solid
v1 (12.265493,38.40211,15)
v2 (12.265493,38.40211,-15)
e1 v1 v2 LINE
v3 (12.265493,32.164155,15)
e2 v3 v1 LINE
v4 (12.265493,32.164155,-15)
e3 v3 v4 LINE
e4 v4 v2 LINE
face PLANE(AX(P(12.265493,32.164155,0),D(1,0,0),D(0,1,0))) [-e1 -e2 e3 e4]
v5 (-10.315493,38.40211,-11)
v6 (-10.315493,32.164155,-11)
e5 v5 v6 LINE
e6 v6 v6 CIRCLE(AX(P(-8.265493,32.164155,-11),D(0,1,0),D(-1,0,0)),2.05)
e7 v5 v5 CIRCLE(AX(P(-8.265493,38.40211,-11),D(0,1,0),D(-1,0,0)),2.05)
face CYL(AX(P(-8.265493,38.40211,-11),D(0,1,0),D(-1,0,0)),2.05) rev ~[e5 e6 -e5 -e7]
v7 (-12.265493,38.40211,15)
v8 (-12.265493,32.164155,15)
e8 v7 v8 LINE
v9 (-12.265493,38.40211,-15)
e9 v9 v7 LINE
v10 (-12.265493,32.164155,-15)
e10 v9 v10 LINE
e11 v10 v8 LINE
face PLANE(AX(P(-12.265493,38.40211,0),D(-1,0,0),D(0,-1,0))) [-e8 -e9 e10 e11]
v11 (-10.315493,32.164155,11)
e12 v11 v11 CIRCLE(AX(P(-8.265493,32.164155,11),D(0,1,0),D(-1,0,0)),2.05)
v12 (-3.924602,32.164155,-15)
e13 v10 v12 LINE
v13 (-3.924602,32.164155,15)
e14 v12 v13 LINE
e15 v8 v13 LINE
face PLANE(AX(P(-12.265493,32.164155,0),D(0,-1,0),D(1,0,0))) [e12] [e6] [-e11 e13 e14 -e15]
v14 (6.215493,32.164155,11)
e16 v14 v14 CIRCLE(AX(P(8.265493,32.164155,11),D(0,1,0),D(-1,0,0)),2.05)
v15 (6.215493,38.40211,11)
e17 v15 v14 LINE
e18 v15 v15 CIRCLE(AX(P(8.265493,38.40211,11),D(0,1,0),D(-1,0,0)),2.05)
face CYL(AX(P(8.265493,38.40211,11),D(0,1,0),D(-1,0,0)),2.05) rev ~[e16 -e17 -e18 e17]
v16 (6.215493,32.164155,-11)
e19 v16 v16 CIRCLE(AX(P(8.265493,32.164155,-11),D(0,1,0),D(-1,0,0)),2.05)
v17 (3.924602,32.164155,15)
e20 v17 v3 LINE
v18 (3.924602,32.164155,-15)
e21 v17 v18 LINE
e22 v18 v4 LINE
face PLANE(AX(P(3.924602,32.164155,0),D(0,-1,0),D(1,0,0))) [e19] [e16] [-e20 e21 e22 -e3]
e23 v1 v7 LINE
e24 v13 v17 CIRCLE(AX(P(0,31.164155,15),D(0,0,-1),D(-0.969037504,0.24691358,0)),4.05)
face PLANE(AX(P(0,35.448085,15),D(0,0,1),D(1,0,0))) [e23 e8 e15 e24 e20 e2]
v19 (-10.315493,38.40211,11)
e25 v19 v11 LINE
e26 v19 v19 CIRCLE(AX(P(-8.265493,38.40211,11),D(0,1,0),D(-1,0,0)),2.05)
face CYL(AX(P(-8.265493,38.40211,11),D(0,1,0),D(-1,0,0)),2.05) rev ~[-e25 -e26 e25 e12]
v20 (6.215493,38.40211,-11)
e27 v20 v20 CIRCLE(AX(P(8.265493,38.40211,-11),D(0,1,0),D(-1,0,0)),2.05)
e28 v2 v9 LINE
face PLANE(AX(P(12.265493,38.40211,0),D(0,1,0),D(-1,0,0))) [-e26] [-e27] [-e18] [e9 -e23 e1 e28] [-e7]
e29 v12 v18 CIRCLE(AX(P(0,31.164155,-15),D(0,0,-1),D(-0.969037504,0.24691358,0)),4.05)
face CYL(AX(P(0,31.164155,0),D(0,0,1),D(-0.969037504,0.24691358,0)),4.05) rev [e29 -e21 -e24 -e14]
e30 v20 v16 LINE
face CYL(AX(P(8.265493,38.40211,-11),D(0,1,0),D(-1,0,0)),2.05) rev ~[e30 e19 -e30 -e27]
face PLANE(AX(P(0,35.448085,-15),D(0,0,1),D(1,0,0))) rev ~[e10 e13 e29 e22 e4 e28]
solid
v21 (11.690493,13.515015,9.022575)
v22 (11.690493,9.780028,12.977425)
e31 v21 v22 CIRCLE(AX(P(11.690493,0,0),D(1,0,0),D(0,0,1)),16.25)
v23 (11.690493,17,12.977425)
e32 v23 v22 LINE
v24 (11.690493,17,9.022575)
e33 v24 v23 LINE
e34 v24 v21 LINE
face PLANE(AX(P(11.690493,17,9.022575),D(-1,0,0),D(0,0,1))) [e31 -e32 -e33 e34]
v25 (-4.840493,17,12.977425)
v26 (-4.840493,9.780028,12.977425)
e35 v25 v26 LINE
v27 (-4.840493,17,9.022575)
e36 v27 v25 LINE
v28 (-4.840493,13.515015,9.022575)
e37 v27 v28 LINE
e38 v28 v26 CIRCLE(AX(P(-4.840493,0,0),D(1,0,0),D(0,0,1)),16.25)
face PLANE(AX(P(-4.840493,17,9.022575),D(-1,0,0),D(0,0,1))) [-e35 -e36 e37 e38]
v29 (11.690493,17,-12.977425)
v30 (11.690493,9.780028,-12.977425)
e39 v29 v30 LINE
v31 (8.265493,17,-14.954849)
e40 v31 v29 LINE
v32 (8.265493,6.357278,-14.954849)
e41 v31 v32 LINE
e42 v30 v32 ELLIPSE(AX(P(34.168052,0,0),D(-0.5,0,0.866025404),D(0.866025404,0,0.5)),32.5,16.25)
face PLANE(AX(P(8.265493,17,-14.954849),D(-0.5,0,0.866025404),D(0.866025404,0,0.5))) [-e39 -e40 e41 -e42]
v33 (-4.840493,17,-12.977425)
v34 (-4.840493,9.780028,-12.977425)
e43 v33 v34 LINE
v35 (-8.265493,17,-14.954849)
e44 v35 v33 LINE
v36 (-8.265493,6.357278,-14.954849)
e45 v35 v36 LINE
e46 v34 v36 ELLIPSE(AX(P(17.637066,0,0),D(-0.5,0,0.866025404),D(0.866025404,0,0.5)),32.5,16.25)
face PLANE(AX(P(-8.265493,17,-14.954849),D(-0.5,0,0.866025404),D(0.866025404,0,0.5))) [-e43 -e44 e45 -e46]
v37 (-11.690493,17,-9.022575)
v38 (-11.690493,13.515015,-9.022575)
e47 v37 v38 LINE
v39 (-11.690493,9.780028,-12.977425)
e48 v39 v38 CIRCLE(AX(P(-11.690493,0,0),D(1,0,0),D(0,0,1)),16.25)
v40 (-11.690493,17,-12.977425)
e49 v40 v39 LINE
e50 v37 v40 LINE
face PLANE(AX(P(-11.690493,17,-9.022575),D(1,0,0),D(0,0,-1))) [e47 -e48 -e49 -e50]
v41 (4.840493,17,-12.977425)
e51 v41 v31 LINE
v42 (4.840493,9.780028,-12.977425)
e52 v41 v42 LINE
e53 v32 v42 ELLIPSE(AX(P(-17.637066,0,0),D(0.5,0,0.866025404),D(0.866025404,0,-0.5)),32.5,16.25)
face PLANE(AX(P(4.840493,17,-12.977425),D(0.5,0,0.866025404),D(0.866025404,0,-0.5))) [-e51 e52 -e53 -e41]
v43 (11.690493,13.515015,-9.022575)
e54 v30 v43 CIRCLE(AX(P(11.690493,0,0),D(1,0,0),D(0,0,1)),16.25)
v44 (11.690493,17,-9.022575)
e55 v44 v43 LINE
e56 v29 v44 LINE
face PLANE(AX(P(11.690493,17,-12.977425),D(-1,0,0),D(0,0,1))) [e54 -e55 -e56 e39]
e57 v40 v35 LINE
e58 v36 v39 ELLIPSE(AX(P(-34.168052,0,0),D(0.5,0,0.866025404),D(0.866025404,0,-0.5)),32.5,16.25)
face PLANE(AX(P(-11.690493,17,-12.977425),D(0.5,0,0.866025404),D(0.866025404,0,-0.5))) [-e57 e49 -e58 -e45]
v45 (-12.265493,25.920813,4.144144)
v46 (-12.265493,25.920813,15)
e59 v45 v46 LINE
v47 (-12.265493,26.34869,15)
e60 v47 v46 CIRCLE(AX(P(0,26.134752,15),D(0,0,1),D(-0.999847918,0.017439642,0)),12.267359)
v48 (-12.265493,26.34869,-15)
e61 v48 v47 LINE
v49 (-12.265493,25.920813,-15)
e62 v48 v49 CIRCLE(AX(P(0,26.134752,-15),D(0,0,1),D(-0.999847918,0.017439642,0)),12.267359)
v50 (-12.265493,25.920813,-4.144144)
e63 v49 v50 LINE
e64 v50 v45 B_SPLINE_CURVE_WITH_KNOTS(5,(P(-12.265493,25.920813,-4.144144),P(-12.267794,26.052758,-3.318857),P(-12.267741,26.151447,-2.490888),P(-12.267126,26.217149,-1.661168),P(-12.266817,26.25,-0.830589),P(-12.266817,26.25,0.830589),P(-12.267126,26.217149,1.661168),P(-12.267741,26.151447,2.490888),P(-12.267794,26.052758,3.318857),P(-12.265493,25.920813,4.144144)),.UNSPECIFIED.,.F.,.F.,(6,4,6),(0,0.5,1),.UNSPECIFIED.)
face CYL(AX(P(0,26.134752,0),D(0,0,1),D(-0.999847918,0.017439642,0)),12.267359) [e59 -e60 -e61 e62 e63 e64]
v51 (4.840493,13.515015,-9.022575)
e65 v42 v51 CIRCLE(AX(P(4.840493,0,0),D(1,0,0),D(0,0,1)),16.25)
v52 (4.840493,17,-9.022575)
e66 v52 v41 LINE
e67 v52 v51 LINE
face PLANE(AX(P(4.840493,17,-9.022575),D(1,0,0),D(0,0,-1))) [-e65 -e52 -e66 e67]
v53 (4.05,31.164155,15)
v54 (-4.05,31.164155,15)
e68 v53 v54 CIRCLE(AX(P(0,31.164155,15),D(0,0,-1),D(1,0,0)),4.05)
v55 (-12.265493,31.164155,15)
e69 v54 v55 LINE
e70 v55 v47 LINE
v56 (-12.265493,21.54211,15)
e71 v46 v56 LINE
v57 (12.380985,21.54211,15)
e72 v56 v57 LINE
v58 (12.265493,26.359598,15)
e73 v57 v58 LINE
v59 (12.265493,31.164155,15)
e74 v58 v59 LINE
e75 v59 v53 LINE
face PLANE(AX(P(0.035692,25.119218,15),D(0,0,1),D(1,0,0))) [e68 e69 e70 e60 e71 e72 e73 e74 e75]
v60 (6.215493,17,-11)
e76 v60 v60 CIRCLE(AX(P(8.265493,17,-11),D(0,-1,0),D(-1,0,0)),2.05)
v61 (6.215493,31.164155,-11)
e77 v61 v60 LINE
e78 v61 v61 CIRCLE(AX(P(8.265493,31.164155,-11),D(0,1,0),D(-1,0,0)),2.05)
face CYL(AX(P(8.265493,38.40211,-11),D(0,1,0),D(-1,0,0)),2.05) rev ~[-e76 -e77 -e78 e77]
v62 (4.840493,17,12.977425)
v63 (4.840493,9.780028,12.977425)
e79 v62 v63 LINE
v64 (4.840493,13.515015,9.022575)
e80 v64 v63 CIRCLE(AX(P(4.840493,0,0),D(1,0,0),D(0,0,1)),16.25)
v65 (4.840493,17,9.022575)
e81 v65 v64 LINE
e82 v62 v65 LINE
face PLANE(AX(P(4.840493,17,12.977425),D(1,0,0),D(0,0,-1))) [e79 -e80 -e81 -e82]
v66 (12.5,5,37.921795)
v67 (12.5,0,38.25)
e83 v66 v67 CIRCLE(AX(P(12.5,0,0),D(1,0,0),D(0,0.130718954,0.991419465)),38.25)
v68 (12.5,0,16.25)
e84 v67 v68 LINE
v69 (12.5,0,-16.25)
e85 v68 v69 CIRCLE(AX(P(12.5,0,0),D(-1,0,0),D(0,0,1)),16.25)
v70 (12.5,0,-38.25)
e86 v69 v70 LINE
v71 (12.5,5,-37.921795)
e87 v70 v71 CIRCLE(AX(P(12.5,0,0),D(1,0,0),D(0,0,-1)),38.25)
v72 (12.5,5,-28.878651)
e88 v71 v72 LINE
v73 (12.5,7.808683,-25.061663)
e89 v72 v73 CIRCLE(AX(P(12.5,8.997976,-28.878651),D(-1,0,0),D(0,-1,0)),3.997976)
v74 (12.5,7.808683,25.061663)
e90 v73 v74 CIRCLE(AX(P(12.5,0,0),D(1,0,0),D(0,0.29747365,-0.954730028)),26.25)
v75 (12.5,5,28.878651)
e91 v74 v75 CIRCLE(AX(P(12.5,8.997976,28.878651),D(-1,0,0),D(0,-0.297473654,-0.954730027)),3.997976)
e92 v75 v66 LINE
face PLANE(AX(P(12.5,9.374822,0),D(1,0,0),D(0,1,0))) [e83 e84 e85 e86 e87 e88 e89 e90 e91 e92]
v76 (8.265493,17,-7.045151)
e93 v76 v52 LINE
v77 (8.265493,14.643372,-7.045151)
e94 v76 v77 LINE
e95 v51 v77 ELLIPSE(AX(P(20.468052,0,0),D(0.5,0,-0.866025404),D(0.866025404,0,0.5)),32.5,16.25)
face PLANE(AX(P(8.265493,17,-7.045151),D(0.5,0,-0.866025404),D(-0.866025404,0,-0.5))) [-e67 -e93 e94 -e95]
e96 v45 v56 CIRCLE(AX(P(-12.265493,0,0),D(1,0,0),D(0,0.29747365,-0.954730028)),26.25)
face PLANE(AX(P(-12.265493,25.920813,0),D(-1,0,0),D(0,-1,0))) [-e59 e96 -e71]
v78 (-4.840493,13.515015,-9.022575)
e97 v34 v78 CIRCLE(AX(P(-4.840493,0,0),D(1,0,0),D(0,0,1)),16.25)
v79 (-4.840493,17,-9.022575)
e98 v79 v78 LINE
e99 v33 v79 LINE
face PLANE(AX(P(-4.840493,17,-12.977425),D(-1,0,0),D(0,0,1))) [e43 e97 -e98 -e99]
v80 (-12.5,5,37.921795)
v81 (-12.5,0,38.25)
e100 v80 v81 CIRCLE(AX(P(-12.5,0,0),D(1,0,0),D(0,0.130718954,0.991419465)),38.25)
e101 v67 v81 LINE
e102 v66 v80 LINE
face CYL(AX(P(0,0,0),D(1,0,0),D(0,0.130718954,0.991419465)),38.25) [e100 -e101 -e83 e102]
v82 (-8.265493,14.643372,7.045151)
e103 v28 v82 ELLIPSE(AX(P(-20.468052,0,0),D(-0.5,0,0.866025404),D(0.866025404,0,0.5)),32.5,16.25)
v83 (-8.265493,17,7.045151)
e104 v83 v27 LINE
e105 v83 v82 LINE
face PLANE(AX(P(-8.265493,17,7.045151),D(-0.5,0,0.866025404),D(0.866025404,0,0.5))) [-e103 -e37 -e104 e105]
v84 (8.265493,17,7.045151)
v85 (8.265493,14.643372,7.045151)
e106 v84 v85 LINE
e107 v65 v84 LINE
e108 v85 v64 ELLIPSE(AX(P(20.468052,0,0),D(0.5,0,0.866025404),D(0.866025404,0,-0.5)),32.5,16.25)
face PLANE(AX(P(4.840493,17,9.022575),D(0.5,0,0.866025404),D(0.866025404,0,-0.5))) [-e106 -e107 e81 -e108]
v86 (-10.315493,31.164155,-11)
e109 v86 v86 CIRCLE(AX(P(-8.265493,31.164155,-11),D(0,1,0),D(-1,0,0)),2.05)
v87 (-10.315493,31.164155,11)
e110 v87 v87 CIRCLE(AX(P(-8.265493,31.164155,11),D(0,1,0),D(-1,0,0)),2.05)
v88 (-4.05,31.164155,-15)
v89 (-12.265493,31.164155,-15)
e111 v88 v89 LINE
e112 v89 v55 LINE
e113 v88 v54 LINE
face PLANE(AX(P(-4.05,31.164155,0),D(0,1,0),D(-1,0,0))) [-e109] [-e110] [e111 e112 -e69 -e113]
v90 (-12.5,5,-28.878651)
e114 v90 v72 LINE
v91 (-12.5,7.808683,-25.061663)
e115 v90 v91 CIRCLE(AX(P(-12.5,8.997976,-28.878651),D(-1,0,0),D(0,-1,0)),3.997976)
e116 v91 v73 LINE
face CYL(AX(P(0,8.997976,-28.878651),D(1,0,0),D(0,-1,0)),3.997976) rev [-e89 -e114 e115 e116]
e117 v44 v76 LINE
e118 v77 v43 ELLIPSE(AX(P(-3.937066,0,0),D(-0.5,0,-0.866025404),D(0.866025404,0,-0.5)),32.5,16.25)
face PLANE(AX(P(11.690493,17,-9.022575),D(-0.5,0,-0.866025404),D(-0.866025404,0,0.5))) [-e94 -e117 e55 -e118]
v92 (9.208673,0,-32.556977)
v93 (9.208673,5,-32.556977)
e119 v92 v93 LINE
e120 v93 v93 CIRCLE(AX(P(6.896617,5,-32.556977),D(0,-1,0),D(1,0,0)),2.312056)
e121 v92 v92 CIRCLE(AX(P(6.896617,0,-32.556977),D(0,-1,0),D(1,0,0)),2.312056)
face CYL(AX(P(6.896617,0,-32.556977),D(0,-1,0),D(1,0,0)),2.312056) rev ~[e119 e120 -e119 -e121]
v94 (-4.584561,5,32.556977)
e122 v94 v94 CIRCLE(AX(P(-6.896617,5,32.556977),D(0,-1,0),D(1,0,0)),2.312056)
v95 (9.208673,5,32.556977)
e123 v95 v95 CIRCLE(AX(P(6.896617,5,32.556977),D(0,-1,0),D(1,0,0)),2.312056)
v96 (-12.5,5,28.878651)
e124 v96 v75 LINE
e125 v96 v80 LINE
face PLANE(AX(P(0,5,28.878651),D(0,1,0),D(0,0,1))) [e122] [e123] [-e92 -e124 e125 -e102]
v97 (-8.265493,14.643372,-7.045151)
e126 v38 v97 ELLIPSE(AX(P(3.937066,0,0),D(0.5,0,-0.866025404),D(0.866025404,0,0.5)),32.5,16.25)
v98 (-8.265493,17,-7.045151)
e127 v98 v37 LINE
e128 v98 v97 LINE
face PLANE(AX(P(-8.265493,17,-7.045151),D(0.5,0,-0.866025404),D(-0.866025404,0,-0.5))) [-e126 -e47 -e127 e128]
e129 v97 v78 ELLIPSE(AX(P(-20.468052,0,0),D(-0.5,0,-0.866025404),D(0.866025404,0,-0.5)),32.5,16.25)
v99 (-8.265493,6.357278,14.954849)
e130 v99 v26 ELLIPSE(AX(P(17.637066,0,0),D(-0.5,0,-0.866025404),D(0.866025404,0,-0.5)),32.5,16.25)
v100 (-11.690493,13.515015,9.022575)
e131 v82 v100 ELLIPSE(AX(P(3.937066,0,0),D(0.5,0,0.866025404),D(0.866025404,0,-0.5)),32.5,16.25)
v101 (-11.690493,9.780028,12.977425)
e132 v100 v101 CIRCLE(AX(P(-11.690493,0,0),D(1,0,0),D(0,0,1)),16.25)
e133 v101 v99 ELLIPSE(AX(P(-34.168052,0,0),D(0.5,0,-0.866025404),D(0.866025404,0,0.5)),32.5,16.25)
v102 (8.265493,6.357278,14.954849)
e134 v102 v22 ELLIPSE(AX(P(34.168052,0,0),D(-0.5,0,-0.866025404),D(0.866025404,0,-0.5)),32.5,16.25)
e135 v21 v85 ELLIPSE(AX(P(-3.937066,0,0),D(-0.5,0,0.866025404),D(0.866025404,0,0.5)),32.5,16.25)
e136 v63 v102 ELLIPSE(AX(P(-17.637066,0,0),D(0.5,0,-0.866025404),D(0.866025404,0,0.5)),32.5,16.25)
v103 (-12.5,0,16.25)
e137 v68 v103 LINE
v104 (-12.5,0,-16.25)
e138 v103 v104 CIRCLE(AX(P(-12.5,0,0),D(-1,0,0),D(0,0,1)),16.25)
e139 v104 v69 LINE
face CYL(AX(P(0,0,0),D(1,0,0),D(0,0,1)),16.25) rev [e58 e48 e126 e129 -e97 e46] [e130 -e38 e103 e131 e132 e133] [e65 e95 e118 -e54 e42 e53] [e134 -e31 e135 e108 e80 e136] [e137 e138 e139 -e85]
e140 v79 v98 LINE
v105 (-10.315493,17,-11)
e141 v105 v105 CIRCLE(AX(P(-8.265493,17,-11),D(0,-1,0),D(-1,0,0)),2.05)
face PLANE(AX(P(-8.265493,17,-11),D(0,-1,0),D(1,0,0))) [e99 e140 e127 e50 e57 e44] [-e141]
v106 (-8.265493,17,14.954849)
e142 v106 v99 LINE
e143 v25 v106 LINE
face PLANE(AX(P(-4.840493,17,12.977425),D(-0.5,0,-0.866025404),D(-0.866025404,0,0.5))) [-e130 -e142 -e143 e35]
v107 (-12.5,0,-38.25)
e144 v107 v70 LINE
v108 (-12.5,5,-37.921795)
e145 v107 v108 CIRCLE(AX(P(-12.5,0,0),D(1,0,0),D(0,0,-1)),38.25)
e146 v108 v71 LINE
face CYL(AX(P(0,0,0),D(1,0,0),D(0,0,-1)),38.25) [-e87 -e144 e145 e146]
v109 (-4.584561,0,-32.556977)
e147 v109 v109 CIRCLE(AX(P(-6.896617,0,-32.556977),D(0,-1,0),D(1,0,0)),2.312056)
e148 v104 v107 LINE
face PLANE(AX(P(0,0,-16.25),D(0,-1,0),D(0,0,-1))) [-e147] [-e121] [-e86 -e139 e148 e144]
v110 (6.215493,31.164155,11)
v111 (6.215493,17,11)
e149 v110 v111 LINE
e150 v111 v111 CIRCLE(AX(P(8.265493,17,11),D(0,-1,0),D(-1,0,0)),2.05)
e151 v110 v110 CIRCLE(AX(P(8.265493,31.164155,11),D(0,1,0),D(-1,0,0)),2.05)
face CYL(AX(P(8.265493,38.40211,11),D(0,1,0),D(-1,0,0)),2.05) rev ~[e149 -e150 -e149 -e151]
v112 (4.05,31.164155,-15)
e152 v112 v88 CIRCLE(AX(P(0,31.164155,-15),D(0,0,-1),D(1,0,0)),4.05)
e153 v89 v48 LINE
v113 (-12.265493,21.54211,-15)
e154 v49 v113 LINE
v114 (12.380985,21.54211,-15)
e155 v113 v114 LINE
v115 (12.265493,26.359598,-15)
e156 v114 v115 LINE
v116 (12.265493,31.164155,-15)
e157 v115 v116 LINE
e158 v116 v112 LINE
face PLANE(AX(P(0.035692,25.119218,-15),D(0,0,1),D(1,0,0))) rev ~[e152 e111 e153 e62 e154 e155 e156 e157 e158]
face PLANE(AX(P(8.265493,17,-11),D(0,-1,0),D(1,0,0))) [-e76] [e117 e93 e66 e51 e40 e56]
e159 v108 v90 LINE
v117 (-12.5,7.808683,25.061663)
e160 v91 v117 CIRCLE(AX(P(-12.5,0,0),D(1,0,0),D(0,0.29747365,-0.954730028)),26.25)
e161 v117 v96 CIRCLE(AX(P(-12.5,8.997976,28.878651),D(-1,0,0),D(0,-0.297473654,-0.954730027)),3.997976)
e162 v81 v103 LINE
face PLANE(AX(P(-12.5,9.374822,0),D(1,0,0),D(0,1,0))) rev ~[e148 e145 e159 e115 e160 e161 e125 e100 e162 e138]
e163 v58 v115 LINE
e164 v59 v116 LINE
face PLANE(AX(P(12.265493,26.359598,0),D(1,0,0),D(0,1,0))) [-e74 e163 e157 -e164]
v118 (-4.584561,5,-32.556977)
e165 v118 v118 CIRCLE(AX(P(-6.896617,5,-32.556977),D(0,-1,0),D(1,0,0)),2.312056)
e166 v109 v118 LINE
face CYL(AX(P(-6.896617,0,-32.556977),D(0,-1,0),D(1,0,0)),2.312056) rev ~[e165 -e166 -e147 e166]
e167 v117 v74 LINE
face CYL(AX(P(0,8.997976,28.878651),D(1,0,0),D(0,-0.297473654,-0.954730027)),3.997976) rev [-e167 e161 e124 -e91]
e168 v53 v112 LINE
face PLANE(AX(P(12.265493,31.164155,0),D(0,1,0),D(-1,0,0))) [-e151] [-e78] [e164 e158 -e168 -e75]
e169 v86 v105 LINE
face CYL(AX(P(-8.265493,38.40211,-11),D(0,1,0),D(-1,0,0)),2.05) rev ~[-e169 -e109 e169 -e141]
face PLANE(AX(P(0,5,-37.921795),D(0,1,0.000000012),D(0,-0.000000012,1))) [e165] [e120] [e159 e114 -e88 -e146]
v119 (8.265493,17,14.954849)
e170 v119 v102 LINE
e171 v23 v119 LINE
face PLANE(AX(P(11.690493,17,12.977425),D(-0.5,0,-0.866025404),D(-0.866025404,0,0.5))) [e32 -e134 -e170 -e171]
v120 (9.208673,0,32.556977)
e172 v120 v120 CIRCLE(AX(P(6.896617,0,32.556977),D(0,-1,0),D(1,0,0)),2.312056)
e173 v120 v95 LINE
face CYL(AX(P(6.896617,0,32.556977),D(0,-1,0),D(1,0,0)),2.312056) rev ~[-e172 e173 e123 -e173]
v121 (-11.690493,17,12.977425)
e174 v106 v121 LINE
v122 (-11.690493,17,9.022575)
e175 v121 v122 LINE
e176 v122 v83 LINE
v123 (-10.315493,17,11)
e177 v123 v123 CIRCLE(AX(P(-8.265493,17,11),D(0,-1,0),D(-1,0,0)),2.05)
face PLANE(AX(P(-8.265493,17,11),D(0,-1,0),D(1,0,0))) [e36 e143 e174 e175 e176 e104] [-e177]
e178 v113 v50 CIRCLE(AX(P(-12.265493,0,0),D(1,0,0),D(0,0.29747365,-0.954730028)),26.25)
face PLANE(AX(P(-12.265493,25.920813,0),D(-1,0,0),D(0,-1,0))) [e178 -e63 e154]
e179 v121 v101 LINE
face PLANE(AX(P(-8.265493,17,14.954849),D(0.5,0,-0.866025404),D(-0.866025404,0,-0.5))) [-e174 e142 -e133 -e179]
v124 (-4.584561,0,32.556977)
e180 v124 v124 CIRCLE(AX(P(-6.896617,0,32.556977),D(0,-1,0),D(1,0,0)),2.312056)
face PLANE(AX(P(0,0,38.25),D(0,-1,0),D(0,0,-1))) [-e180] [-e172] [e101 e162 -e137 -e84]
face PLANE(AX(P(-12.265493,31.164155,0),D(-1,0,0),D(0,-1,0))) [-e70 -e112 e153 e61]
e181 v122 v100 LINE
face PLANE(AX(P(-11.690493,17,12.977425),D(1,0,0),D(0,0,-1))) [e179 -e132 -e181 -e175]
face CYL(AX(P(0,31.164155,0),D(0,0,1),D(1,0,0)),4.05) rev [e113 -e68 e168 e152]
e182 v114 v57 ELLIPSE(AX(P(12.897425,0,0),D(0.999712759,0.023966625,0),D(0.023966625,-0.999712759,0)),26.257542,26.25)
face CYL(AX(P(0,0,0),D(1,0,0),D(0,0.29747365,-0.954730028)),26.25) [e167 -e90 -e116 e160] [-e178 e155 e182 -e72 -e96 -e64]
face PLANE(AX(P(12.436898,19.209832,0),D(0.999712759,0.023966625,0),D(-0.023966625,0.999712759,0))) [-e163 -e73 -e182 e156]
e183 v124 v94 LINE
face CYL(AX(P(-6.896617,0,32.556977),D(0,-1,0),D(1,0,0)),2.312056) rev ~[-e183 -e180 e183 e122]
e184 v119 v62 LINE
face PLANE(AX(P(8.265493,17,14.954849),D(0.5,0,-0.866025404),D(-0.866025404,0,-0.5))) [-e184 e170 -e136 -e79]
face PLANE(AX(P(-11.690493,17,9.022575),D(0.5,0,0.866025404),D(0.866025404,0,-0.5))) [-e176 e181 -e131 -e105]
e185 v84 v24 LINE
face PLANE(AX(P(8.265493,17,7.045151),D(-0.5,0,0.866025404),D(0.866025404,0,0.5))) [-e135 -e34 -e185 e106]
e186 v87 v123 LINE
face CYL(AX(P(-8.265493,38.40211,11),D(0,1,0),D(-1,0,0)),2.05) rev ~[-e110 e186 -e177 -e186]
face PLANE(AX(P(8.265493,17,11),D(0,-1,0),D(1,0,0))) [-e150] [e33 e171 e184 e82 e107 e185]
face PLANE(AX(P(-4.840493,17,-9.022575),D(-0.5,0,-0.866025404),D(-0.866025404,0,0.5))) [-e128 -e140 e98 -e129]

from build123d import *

# Parameters (mm, degrees)
F1_DEPTH  = 12.5
F2_R      = 2.3120560343
F3_DEPTH  = 26.251
F5_DEPTH  = 15
F6_R      = 2.05
F7_DEPTH  = 35
F9_R      = 2.05
F10_DEPTH = 25


# Not quite as in the source:
# - ends of sketch curves that miss each other by under 0.0002 mm in the source are joined


with BuildPart() as f1:
    # F0 (on Right) → F1 (new body, symmetric)
    with BuildSketch(Plane.YZ):
        with BuildLine():
            ThreePointArc((0, 16.25), (16.25, 0), (0, -16.25))
            Line((0, -16.25), (0, -38.25))
            ThreePointArc((0, -38.25), (2.5053801525, -38.1678604364), (5, -37.921794525))
            Line((5, -37.921794525), (4.9999998882, -28.8786509221))
            ThreePointArc((4.9999998882, -28.8786509221), (5.7778380649, -26.509152159), (7.8086833246, -25.0616632476))
            ThreePointArc((7.8086833246, -25.0616632476), (26.25, -5.08e-08), (7.8086834216, 25.0616632174))
            ThreePointArc((7.8086834216, 25.0616632174), (5.7778381721, 26.5091521304), (5, 28.8786508873))
            Line((5, 28.8786508873), (5, 37.921794525))
            ThreePointArc((5, 37.921794525), (2.5053801525, 38.1678604364), (0, 38.25))
            Line((0, 38.25), (0, 16.25))
        make_face()
    extrude(amount=F1_DEPTH, both=True)

    # F2 (on Front) → F3 (cut, through all)
    with BuildSketch(Plane.XZ):
        with Locations((6.896616891, 32.556977123)):
            Circle(F2_R)
        with Locations((-6.896616891, 32.556977123)):
            Circle(F2_R)
        with Locations((-6.896616891, -32.556977123)):
            Circle(F2_R)
        with Locations((6.896616891, -32.556977123)):
            Circle(F2_R)
    extrude(amount=-F3_DEPTH, mode=Mode.SUBTRACT)

    # F4 (on Top) → F5 (join, symmetric)
    with BuildSketch(Plane.XY):
        with BuildLine():
            ThreePointArc((4.05, 31.1641552804), (0, 27.1141552804), (-4.05, 31.1641552804))
            Line((-4.05, 31.1641552804), (-12.2654928641, 31.1641552804))
            Line((-12.2654928641, 31.1641552804), (-12.2654928641, 26.3486900835))
            Line((-12.2654928641, 26.3486900835), (-12.2654928641, 25.9208133907))
            Line((-12.2654928641, 25.9208133907), (-12.2654928641, 19.209831953))
            Line((-12.2654928641, 19.209831953), (-10.1258861735, 19.209831953))
            Line((-10.1258861735, 19.209831953), (10.1258861735, 19.209831953))
            Line((10.1258861735, 19.209831953), (12.4368978535, 19.209831953))
            Line((12.4368978535, 19.209831953), (12.2654928641, 26.3595975861))
            Line((12.2654928641, 26.3595975861), (12.2654928641, 31.1641552804))
            Line((12.2654928641, 31.1641552804), (4.05, 31.1641552804))
        make_face()
        with BuildLine():
            Line((-12.2654928641, 25.9208133907), (-12.2654928641, 26.3486900835))
            ThreePointArc((-12.2654928641, 26.3486900835), (-12.2673585101, 26.1347517371), (-12.2654928641, 25.9208133907))
        make_face()
    extrude(amount=F5_DEPTH, both=True)


with BuildPart() as f5:
    # F4 (on Top) → F5, piece 2 (new body, symmetric)
    with BuildSketch(Plane.XY):
        with BuildLine():
            Line((12.2654928641, 38.4021102472), (0, 38.4021102472))
            Line((0, 38.4021102472), (-12.2654928641, 38.4021102472))
            Line((-12.2654928641, 38.4021102472), (-12.2654928641, 32.1641552804))
            Line((-12.2654928641, 32.1641552804), (-3.9246018906, 32.1641552804))
            ThreePointArc((-3.9246018906, 32.1641552804), (0, 35.2141552804), (3.9246018906, 32.1641552804))
            Line((3.9246018906, 32.1641552804), (12.2654928641, 32.1641552804))
            Line((12.2654928641, 32.1641552804), (12.2654928641, 38.4021102472))
        make_face()
    extrude(amount=F5_DEPTH, both=True)


with BuildPart() as f7_tool:
    # F6 (on face) → F7 (new body)
    with BuildSketch(Plane(origin=(0, 38.4021102472, 0), x_dir=(-1, 0, 0), z_dir=(0, 1, 0))):
        with Locations((-8.2654928641, 11)):
            Circle(F6_R)
        with Locations((8.2654928641, 11)):
            Circle(F6_R)
        with Locations((-8.2654928641, -11)):
            Circle(F6_R)
        with Locations((8.2654928641, -11)):
            Circle(F6_R)
    extrude(amount=-F7_DEPTH)


with BuildPart() as f1_1:
    add(f1.part)

    # F7: cut by f7_tool
    add(f7_tool.part, mode=Mode.SUBTRACT)

    # F9 (on offset) → F10 (cut)
    with BuildSketch(Plane.XZ.offset(-17)):
        Polygon((4.8404928641, 12.977424672), (4.8404928641, 9.022575328), (8.2654928641, 7.0451506561), (11.6904928641, 9.022575328), (11.6904928641, 12.977424672), (8.2654928641, 14.9548493439), align=None)
        with Locations((8.2654928641, 11)):
            Circle(F9_R, mode=Mode.SUBTRACT)
        Polygon((-4.8404928641, 9.022575328), (-4.8404928641, 12.977424672), (-8.2654928641, 14.9548493439), (-11.6904928641, 12.977424672), (-11.6904928641, 9.022575328), (-8.2654928641, 7.0451506561), align=None)
        with Locations((-8.2654928641, 11)):
            Circle(F9_R, mode=Mode.SUBTRACT)
        Polygon((8.2654928641, -7.0451506561), (4.8404928641, -9.022575328), (4.8404928641, -12.977424672), (8.2654928641, -14.9548493439), (11.6904928641, -12.977424672), (11.6904928641, -9.022575328), align=None)
        with Locations((8.2654928641, -11)):
            Circle(F9_R, mode=Mode.SUBTRACT)
        Polygon((-11.6904928641, -9.022575328), (-11.6904928641, -12.977424672), (-8.2654928641, -14.9548493439), (-4.8404928641, -12.977424672), (-4.8404928641, -9.022575328), (-8.2654928641, -7.0451506561), align=None)
        with Locations((-8.2654928641, -11)):
            Circle(F9_R, mode=Mode.SUBTRACT)
    extrude(amount=F10_DEPTH, mode=Mode.SUBTRACT)


with BuildPart() as f5_1:
    add(f5.part)

    # F7: cut by f7_tool
    add(f7_tool.part, mode=Mode.SUBTRACT)


solid = Compound([f1_1.part, f5_1.part])
